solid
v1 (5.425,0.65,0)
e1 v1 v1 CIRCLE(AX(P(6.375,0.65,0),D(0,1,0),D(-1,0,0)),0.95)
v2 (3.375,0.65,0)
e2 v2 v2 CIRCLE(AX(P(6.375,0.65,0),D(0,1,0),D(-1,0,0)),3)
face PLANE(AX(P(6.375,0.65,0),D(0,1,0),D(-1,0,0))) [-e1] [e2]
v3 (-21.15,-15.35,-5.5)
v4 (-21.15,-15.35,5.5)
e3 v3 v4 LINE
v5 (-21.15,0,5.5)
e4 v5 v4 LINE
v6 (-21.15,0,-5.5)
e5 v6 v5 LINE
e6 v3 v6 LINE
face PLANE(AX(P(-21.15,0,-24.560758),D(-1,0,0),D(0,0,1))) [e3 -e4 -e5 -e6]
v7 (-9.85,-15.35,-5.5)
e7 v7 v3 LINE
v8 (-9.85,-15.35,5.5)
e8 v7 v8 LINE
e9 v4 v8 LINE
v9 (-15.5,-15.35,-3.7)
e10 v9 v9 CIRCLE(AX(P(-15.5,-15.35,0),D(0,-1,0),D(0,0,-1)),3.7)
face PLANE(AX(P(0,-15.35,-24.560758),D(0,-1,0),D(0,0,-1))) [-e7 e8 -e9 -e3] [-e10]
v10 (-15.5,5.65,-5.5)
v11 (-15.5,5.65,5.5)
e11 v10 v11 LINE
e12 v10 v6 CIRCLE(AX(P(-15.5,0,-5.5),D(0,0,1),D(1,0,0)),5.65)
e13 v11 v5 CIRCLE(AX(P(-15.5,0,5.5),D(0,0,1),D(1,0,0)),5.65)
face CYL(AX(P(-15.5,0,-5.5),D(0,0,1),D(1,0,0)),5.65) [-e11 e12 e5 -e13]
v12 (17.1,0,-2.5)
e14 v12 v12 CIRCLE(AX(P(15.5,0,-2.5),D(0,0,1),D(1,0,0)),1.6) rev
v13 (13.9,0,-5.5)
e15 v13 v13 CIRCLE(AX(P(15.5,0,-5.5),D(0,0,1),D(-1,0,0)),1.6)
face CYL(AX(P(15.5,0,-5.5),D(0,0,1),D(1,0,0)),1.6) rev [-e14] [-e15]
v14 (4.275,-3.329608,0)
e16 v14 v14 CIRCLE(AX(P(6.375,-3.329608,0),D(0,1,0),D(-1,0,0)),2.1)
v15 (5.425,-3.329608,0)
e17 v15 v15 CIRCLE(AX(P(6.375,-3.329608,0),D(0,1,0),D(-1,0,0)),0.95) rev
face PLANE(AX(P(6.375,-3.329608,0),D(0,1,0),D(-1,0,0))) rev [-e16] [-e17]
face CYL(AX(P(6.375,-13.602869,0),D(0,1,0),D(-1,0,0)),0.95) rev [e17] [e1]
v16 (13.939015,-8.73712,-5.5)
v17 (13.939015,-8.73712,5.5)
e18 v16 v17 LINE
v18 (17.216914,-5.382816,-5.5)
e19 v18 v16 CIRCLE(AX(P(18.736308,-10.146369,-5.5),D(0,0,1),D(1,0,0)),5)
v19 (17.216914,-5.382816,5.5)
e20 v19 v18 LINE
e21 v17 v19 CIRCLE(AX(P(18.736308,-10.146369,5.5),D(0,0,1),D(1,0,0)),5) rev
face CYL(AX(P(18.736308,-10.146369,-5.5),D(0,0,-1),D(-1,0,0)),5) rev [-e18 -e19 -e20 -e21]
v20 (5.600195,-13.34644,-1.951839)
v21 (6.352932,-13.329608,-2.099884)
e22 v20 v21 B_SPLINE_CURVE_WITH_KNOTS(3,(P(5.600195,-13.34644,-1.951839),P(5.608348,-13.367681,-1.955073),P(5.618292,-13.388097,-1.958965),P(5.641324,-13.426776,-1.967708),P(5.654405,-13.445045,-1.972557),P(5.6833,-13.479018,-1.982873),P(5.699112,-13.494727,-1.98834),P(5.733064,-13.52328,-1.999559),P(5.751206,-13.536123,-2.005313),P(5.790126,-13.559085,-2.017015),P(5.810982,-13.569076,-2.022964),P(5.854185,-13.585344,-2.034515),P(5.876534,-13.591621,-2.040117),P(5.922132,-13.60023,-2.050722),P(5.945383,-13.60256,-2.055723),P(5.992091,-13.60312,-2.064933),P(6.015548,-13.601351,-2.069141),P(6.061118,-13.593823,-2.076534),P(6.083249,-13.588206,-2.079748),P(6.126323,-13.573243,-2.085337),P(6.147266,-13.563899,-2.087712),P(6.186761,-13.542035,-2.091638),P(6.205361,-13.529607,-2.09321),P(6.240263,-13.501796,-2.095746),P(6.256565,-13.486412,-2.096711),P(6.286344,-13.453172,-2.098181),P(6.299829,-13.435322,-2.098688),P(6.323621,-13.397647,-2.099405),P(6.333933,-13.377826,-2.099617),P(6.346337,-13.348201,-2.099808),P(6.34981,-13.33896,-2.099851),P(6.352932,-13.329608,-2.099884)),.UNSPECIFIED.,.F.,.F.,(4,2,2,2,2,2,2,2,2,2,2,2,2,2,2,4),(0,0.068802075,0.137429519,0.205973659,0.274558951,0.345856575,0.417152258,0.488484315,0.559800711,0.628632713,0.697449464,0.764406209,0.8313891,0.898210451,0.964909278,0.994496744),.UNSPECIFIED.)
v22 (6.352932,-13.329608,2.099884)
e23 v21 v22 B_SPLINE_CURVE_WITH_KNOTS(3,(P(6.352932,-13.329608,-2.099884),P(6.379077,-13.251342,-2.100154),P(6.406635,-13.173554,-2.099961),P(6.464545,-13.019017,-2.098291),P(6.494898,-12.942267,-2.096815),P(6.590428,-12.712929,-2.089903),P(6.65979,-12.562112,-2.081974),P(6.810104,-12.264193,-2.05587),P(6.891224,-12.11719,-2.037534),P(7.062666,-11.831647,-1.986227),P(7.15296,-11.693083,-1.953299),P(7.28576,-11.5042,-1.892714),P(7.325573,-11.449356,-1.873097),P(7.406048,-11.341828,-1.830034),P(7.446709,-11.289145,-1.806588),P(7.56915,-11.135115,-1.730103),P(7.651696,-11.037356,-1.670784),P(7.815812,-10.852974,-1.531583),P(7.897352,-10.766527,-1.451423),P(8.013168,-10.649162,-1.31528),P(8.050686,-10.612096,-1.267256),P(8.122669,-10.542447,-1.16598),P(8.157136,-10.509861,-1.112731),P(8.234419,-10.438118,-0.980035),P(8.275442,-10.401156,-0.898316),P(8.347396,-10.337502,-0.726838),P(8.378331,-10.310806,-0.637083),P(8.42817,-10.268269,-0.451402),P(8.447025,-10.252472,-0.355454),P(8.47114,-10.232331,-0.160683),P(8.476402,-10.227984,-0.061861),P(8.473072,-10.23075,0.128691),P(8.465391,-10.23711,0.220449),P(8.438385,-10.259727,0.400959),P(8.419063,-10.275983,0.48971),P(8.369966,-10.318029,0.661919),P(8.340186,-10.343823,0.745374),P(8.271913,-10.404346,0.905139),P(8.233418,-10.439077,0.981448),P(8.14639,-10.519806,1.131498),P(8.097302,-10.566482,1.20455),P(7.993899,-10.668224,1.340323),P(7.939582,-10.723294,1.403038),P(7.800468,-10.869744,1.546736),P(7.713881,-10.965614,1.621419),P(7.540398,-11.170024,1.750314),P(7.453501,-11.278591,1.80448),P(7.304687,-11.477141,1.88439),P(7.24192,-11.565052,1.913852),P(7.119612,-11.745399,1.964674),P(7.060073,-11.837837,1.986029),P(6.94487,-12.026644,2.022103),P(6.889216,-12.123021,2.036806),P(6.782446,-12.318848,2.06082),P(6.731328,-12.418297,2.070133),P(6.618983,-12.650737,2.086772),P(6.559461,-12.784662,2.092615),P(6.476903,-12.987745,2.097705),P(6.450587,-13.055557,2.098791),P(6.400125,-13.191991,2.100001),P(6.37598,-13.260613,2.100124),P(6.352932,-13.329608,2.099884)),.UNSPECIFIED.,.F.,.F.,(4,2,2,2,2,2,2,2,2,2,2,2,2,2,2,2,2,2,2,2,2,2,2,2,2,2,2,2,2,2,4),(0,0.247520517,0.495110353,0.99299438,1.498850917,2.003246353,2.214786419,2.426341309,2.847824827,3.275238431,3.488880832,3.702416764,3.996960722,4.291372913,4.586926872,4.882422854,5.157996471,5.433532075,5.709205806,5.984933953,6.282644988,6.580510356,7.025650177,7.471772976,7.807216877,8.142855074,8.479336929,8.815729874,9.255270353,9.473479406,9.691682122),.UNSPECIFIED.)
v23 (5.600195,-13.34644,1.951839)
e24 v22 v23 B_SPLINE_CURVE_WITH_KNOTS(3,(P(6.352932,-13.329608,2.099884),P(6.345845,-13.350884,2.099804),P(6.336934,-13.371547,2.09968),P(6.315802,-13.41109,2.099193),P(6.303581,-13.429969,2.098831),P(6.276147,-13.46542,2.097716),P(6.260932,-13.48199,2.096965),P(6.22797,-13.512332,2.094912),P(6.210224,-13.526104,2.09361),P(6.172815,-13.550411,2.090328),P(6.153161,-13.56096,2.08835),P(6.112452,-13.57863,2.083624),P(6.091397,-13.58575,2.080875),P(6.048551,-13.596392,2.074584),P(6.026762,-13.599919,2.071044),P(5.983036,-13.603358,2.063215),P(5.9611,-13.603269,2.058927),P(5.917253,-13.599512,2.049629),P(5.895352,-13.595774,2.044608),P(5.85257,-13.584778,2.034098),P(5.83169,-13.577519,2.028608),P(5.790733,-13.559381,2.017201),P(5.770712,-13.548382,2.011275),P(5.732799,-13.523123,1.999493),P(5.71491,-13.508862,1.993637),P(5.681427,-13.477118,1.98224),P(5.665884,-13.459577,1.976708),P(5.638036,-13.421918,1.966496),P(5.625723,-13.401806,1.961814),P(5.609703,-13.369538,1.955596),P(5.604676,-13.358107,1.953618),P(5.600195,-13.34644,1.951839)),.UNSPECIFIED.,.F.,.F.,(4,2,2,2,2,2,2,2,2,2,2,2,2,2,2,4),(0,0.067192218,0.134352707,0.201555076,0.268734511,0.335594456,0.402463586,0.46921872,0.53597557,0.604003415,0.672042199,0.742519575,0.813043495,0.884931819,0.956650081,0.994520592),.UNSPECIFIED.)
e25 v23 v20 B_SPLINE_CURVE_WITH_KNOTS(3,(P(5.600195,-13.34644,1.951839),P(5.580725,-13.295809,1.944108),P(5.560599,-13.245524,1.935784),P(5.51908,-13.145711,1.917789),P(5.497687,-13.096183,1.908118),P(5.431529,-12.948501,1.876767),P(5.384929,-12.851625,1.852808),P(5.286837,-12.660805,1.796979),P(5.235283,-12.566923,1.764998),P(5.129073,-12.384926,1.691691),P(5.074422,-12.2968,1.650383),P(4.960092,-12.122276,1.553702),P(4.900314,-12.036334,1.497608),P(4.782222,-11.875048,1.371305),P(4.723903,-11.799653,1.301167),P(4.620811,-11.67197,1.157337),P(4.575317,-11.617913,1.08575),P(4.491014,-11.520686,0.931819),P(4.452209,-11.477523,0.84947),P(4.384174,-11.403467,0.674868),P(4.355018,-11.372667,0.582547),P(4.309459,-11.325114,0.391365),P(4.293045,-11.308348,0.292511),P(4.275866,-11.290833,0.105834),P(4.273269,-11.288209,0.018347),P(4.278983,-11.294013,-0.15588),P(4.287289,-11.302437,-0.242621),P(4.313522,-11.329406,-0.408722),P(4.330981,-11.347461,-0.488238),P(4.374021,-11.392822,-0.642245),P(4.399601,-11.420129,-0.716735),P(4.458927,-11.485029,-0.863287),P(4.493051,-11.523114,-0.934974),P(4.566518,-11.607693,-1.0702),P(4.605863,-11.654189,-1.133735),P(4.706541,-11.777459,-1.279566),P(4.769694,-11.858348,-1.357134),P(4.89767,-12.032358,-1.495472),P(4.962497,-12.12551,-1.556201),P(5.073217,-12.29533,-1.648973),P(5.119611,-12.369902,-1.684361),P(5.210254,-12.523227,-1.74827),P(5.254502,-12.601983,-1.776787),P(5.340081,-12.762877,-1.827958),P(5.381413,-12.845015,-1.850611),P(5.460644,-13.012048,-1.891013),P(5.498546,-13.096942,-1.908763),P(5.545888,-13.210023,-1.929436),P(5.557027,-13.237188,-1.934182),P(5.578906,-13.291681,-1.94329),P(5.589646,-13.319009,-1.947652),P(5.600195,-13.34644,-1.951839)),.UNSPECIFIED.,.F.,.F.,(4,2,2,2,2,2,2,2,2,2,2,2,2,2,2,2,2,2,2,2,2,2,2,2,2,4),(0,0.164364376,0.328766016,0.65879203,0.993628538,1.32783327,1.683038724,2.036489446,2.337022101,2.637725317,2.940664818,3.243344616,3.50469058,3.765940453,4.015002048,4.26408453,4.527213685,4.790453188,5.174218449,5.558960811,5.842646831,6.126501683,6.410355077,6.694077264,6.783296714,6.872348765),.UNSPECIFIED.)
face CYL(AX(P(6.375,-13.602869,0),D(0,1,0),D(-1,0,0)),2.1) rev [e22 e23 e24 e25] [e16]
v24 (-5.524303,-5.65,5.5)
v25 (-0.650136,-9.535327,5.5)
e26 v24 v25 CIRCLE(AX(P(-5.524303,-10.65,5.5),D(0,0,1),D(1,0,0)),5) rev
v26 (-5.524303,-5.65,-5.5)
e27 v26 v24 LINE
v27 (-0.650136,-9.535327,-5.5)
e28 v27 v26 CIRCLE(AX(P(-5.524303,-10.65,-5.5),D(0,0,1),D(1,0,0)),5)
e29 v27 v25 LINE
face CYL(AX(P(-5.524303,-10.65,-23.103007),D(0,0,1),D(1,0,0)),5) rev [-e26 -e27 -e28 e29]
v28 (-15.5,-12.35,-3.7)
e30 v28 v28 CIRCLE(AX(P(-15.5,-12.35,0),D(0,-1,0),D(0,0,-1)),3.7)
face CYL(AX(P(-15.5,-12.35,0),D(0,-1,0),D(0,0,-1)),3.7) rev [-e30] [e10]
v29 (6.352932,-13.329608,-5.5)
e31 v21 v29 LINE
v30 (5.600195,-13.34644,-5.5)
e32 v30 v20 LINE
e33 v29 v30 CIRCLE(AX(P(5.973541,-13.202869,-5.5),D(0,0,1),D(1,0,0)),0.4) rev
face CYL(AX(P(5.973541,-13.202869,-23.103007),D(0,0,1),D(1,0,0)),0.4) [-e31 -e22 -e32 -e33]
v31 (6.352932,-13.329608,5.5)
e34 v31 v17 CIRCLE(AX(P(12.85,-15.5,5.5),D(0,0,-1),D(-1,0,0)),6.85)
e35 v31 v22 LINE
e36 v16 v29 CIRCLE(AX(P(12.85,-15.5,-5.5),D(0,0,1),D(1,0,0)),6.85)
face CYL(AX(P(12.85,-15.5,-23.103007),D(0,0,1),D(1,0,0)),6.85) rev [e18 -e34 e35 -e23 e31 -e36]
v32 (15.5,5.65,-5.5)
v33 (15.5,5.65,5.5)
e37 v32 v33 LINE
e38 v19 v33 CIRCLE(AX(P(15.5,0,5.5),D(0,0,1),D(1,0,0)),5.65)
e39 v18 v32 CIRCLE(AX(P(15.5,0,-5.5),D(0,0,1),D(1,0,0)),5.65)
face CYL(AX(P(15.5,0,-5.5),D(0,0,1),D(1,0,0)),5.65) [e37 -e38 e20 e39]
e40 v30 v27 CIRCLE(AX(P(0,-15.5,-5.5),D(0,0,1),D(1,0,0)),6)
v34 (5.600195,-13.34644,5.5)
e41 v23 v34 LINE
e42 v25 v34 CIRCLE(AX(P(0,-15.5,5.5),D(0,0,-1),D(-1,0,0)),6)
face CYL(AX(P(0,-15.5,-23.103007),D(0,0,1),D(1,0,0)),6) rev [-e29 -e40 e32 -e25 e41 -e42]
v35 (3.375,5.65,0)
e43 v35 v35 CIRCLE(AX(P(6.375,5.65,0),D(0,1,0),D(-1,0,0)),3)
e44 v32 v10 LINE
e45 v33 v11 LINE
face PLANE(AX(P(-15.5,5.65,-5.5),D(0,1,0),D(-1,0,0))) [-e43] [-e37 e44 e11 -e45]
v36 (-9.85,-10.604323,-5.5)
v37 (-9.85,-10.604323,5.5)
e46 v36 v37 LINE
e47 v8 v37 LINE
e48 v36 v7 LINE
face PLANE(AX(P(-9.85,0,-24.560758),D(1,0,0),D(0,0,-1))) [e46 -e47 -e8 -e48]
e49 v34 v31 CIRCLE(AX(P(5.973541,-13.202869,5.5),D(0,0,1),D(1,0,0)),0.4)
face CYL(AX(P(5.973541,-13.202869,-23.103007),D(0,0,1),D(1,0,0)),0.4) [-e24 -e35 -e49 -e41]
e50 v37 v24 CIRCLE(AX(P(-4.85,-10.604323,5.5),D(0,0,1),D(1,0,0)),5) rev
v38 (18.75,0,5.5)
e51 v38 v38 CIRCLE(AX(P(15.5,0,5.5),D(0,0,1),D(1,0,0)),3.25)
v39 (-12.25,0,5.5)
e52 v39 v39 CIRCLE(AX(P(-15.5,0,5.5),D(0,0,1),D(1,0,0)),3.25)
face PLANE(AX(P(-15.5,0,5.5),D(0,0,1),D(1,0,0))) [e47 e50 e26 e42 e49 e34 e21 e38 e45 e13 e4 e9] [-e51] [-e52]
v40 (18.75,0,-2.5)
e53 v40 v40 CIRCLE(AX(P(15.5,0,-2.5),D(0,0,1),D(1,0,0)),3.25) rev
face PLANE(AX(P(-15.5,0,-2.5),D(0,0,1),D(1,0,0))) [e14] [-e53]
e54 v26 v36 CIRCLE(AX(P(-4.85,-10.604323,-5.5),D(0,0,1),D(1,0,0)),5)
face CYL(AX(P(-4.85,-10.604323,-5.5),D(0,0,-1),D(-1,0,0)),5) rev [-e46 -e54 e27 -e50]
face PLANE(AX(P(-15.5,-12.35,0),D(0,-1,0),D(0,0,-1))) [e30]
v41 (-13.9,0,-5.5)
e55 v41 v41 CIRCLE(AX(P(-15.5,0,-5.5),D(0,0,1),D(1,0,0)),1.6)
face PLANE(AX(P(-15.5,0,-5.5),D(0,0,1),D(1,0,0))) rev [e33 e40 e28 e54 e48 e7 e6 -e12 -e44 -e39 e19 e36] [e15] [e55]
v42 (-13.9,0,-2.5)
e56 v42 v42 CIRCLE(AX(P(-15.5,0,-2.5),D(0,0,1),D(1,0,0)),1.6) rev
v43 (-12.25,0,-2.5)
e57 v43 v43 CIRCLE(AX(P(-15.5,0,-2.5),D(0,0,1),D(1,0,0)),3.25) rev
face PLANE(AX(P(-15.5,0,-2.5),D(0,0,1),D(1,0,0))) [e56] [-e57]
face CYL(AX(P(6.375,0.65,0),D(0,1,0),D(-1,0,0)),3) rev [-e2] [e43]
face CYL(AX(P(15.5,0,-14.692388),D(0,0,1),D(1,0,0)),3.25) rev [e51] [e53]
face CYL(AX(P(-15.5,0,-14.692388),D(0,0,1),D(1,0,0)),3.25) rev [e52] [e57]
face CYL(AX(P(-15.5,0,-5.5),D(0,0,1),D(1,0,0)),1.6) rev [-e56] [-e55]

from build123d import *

# Parameters (mm, degrees)
BOSS_EXTRUDE1_DEPTH      = 5.5
BOSS_EXTRUDE1_DEPTH_BACK = 5.5
SKETCH1_R                = 1.6
SKETCH4_R                = 3
CUT_EXTRUDE2_DEPTH       = 5
BOSS_EXTRUDE2_DEPTH      = 11
FILLET1_R                = 0.4
SKETCH7_R                = 0.95
CUT_EXTRUDE3_DEPTH       = 30.124654232
CUT_EXTRUDE5_DEPTH       = 10
CUT_EXTRUDE5_DEPTH_BACK  = 30.124654236
CUT_EXTRUDE5_START       = -18.97961
SKETCH8_R                = 2.1
FILLET2_R                = 5
SKETCH9_R                = 3.25
CUT_EXTRUDE6_DEPTH       = 8
BOSS_EXTRUDE3_START      = -11
SKETCH10_W               = 5.65
SKETCH10_H               = 9.7
BOSS_EXTRUDE3_DEPTH      = 11
SKETCH11_R               = 3.7
CUT_EXTRUDE7_DEPTH       = 3
FILLET3_R                = 5


with BuildPart() as part:
    # Sketch1 → Boss-Extrude1 (new, two sides: drawn at the far end of the back side and taken through both)
    with BuildSketch(Plane.XY.offset(-BOSS_EXTRUDE1_DEPTH_BACK)):
        with BuildLine():
            Line((-15.5, 5.65), (15.5, 5.65))
            ThreePointArc((15.5, 5.65), (21.15, 0), (15.5, -5.65))
            Line((15.5, -5.65), (-15.5, -5.65))
            ThreePointArc((-15.5, -5.65), (-21.15, 0), (-15.5, 5.65))
        make_face()
        with Locations((-15.5, 0)):
            Circle(SKETCH1_R, mode=Mode.SUBTRACT)
        with Locations(Location((15.5, 0, 0), (0, 0, 180))):
            Circle(SKETCH1_R, mode=Mode.SUBTRACT)
    extrude(amount=BOSS_EXTRUDE1_DEPTH + BOSS_EXTRUDE1_DEPTH_BACK)

    # Sketch4 → Cut-Extrude2 (cut)
    with BuildSketch(Plane(origin=(0, 5.65, 0), x_dir=(1, 0, 0), z_dir=(0, 1, 0))):
        with Locations(Location((6.375, 0, 0), (0, 0, 180))):
            Circle(SKETCH4_R)
    extrude(amount=-CUT_EXTRUDE2_DEPTH, mode=Mode.SUBTRACT)

    # Sketch6 → Boss-Extrude2 (add)
    with BuildSketch(Plane.XY.offset(5.5)):
        with BuildLine():
            Line((-0.65013639, -9.535327111), (-0.65013639, -5.65))
            Line((-0.65013639, -5.65), (13.939015195, -5.65))
            Line((13.939015195, -5.65), (13.939015195, -8.737119999))
            ThreePointArc((13.939015195, -8.737119999), (8.407998992, -10.285488801), (6, -15.5))
            ThreePointArc((6, -15.5), (4.006194058, -11.03341191), (-0.65013639, -9.535327111))
        make_face()
    extrude(amount=-BOSS_EXTRUDE2_DEPTH)

    # Fillet1
    fillet1_edges = [part.edges().sort_by_distance(p)[0] for p in [
        (6, -15.5, 0),
    ]]
    fillet(fillet1_edges, radius=FILLET1_R)

    # Sketch7 → Cut-Extrude3 (cut, through all)
    with BuildSketch(Plane(origin=(0, 5.65, 0), x_dir=(1, 0, 0), z_dir=(0, 1, 0))):
        with Locations(Location((6.375, 0, 0), (0, 0, 180))):
            Circle(SKETCH7_R)
    extrude(amount=-CUT_EXTRUDE3_DEPTH, mode=Mode.SUBTRACT)

    # Sketch8 → Cut-Extrude5 (cut, two sides: drawn at the far end of the back side and taken through both)
    with BuildSketch(Plane(origin=(0, 5.65, 0), x_dir=(1, 0, 0), z_dir=(0, 1, 0)).offset(CUT_EXTRUDE5_START - CUT_EXTRUDE5_DEPTH_BACK)):
        with Locations(Location((6.375, 0, 0), (0, 0, 180))):
            Circle(SKETCH8_R)
    extrude(amount=CUT_EXTRUDE5_DEPTH + CUT_EXTRUDE5_DEPTH_BACK, mode=Mode.SUBTRACT)

    # Fillet2
    # the kernel refuses this fillet: 5 mm, written as the material it adds along each edge
    with BuildSketch(Plane(origin=(13.939015195, -5.65, 5.5), x_dir=(0, -1, 0), z_dir=(0, 0, -1))) as fillet2_piece_1:
        with BuildLine():
            CenterArc((4.496369398, -4.797292583), FILLET2_R, 106.370642389, 55.938643206)
            Line((-0.26718431, -3.27789926), (-0.743539681, -3.125959928))
            ThreePointArc((-0.743539681, -3.125959928), (-0.5, -1.560984805), (-0.5, 0))
            Line((-0.5, 0), (0, 0.5))
            ThreePointArc((0, 0.5), (1.54356, 0.5), (2.946195059, 0.479729258))
            Line((2.946195059, 0.479729258), (3.087119999, 0))
        make_face()
    extrude(amount=11)
    with BuildSketch(Plane(origin=(-0.65013639, -5.65, 5.5), x_dir=(0, -1, 0), z_dir=(0, 0, -1))) as fillet2_piece_2:
        with BuildLine():
            CenterArc((5, 4.874167042), FILLET2_R, 180, 77.118546425)
            Line((0, 4.874167042), (-0.1, 4.874167042))
            Line((-0.1, 4.874167042), (-0.1, 0))
            Line((-0.1, 0), (0, -0.1))
            ThreePointArc((0, -0.1), (1.942663555, -0.1), (3.863033653, -0.097483341))
            Line((3.863033653, -0.097483341), (3.885327111, 0))
        make_face()
    extrude(amount=11)

    # Sketch9 → Cut-Extrude6 (cut)
    with BuildSketch(Plane.XY.offset(5.5)):
        with Locations((-15.5, 0)):
            Circle(SKETCH9_R)
        with Locations((15.5, 0)):
            Circle(SKETCH9_R)
    extrude(amount=-CUT_EXTRUDE6_DEPTH, mode=Mode.SUBTRACT)

    # Sketch10 → Boss-Extrude3 (add)
    with BuildSketch(Plane.XY.offset(5.5).offset(BOSS_EXTRUDE3_START)):
        with Locations((-12.675, -10.5)):
            Rectangle(SKETCH10_W, SKETCH10_H)
        with BuildLine():
            Line((-15.5, -15.35), (-15.5, -5.65))
            ThreePointArc((-15.5, -5.65), (-19.495153314, -3.995153314), (-21.15, 0))
            Line((-21.15, 0), (-21.15, -15.35))
            Line((-21.15, -15.35), (-15.5, -15.35))
        make_face()
    extrude(amount=BOSS_EXTRUDE3_DEPTH)

    # Sketch11 → Cut-Extrude7 (cut)
    with BuildSketch(Plane.XZ.offset(15.35)):
        with Locations(Location((-15.5, 0, 0), (0, 0, 270))):
            Circle(SKETCH11_R)
    extrude(amount=-CUT_EXTRUDE7_DEPTH, mode=Mode.SUBTRACT)

    # Fillet3
    # the kernel refuses this fillet: 5 mm, written as the material it adds along each edge
    with BuildSketch(Plane(origin=(-9.85, -5.65, -5.5), x_dir=(1, 0, 0), z_dir=(0, 0, 1))) as fillet3_piece_1:
        with BuildLine():
            CenterArc((5, -4.954322848), FILLET3_R, 97.75056413, 82.24943587)
            Line((0, -4.954322848), (-0.1, -4.954322848))
            Line((-0.1, -4.954322848), (-0.1, 0))
            Line((-0.1, 0), (0, 0.1))
            ThreePointArc((0, 0.1), (2.162848284, 0.1), (4.3122105, 0.099086457))
            Line((4.3122105, 0.099086457), (4.325696569, 0))
        make_face()
    extrude(amount=11)


solid = part.part
